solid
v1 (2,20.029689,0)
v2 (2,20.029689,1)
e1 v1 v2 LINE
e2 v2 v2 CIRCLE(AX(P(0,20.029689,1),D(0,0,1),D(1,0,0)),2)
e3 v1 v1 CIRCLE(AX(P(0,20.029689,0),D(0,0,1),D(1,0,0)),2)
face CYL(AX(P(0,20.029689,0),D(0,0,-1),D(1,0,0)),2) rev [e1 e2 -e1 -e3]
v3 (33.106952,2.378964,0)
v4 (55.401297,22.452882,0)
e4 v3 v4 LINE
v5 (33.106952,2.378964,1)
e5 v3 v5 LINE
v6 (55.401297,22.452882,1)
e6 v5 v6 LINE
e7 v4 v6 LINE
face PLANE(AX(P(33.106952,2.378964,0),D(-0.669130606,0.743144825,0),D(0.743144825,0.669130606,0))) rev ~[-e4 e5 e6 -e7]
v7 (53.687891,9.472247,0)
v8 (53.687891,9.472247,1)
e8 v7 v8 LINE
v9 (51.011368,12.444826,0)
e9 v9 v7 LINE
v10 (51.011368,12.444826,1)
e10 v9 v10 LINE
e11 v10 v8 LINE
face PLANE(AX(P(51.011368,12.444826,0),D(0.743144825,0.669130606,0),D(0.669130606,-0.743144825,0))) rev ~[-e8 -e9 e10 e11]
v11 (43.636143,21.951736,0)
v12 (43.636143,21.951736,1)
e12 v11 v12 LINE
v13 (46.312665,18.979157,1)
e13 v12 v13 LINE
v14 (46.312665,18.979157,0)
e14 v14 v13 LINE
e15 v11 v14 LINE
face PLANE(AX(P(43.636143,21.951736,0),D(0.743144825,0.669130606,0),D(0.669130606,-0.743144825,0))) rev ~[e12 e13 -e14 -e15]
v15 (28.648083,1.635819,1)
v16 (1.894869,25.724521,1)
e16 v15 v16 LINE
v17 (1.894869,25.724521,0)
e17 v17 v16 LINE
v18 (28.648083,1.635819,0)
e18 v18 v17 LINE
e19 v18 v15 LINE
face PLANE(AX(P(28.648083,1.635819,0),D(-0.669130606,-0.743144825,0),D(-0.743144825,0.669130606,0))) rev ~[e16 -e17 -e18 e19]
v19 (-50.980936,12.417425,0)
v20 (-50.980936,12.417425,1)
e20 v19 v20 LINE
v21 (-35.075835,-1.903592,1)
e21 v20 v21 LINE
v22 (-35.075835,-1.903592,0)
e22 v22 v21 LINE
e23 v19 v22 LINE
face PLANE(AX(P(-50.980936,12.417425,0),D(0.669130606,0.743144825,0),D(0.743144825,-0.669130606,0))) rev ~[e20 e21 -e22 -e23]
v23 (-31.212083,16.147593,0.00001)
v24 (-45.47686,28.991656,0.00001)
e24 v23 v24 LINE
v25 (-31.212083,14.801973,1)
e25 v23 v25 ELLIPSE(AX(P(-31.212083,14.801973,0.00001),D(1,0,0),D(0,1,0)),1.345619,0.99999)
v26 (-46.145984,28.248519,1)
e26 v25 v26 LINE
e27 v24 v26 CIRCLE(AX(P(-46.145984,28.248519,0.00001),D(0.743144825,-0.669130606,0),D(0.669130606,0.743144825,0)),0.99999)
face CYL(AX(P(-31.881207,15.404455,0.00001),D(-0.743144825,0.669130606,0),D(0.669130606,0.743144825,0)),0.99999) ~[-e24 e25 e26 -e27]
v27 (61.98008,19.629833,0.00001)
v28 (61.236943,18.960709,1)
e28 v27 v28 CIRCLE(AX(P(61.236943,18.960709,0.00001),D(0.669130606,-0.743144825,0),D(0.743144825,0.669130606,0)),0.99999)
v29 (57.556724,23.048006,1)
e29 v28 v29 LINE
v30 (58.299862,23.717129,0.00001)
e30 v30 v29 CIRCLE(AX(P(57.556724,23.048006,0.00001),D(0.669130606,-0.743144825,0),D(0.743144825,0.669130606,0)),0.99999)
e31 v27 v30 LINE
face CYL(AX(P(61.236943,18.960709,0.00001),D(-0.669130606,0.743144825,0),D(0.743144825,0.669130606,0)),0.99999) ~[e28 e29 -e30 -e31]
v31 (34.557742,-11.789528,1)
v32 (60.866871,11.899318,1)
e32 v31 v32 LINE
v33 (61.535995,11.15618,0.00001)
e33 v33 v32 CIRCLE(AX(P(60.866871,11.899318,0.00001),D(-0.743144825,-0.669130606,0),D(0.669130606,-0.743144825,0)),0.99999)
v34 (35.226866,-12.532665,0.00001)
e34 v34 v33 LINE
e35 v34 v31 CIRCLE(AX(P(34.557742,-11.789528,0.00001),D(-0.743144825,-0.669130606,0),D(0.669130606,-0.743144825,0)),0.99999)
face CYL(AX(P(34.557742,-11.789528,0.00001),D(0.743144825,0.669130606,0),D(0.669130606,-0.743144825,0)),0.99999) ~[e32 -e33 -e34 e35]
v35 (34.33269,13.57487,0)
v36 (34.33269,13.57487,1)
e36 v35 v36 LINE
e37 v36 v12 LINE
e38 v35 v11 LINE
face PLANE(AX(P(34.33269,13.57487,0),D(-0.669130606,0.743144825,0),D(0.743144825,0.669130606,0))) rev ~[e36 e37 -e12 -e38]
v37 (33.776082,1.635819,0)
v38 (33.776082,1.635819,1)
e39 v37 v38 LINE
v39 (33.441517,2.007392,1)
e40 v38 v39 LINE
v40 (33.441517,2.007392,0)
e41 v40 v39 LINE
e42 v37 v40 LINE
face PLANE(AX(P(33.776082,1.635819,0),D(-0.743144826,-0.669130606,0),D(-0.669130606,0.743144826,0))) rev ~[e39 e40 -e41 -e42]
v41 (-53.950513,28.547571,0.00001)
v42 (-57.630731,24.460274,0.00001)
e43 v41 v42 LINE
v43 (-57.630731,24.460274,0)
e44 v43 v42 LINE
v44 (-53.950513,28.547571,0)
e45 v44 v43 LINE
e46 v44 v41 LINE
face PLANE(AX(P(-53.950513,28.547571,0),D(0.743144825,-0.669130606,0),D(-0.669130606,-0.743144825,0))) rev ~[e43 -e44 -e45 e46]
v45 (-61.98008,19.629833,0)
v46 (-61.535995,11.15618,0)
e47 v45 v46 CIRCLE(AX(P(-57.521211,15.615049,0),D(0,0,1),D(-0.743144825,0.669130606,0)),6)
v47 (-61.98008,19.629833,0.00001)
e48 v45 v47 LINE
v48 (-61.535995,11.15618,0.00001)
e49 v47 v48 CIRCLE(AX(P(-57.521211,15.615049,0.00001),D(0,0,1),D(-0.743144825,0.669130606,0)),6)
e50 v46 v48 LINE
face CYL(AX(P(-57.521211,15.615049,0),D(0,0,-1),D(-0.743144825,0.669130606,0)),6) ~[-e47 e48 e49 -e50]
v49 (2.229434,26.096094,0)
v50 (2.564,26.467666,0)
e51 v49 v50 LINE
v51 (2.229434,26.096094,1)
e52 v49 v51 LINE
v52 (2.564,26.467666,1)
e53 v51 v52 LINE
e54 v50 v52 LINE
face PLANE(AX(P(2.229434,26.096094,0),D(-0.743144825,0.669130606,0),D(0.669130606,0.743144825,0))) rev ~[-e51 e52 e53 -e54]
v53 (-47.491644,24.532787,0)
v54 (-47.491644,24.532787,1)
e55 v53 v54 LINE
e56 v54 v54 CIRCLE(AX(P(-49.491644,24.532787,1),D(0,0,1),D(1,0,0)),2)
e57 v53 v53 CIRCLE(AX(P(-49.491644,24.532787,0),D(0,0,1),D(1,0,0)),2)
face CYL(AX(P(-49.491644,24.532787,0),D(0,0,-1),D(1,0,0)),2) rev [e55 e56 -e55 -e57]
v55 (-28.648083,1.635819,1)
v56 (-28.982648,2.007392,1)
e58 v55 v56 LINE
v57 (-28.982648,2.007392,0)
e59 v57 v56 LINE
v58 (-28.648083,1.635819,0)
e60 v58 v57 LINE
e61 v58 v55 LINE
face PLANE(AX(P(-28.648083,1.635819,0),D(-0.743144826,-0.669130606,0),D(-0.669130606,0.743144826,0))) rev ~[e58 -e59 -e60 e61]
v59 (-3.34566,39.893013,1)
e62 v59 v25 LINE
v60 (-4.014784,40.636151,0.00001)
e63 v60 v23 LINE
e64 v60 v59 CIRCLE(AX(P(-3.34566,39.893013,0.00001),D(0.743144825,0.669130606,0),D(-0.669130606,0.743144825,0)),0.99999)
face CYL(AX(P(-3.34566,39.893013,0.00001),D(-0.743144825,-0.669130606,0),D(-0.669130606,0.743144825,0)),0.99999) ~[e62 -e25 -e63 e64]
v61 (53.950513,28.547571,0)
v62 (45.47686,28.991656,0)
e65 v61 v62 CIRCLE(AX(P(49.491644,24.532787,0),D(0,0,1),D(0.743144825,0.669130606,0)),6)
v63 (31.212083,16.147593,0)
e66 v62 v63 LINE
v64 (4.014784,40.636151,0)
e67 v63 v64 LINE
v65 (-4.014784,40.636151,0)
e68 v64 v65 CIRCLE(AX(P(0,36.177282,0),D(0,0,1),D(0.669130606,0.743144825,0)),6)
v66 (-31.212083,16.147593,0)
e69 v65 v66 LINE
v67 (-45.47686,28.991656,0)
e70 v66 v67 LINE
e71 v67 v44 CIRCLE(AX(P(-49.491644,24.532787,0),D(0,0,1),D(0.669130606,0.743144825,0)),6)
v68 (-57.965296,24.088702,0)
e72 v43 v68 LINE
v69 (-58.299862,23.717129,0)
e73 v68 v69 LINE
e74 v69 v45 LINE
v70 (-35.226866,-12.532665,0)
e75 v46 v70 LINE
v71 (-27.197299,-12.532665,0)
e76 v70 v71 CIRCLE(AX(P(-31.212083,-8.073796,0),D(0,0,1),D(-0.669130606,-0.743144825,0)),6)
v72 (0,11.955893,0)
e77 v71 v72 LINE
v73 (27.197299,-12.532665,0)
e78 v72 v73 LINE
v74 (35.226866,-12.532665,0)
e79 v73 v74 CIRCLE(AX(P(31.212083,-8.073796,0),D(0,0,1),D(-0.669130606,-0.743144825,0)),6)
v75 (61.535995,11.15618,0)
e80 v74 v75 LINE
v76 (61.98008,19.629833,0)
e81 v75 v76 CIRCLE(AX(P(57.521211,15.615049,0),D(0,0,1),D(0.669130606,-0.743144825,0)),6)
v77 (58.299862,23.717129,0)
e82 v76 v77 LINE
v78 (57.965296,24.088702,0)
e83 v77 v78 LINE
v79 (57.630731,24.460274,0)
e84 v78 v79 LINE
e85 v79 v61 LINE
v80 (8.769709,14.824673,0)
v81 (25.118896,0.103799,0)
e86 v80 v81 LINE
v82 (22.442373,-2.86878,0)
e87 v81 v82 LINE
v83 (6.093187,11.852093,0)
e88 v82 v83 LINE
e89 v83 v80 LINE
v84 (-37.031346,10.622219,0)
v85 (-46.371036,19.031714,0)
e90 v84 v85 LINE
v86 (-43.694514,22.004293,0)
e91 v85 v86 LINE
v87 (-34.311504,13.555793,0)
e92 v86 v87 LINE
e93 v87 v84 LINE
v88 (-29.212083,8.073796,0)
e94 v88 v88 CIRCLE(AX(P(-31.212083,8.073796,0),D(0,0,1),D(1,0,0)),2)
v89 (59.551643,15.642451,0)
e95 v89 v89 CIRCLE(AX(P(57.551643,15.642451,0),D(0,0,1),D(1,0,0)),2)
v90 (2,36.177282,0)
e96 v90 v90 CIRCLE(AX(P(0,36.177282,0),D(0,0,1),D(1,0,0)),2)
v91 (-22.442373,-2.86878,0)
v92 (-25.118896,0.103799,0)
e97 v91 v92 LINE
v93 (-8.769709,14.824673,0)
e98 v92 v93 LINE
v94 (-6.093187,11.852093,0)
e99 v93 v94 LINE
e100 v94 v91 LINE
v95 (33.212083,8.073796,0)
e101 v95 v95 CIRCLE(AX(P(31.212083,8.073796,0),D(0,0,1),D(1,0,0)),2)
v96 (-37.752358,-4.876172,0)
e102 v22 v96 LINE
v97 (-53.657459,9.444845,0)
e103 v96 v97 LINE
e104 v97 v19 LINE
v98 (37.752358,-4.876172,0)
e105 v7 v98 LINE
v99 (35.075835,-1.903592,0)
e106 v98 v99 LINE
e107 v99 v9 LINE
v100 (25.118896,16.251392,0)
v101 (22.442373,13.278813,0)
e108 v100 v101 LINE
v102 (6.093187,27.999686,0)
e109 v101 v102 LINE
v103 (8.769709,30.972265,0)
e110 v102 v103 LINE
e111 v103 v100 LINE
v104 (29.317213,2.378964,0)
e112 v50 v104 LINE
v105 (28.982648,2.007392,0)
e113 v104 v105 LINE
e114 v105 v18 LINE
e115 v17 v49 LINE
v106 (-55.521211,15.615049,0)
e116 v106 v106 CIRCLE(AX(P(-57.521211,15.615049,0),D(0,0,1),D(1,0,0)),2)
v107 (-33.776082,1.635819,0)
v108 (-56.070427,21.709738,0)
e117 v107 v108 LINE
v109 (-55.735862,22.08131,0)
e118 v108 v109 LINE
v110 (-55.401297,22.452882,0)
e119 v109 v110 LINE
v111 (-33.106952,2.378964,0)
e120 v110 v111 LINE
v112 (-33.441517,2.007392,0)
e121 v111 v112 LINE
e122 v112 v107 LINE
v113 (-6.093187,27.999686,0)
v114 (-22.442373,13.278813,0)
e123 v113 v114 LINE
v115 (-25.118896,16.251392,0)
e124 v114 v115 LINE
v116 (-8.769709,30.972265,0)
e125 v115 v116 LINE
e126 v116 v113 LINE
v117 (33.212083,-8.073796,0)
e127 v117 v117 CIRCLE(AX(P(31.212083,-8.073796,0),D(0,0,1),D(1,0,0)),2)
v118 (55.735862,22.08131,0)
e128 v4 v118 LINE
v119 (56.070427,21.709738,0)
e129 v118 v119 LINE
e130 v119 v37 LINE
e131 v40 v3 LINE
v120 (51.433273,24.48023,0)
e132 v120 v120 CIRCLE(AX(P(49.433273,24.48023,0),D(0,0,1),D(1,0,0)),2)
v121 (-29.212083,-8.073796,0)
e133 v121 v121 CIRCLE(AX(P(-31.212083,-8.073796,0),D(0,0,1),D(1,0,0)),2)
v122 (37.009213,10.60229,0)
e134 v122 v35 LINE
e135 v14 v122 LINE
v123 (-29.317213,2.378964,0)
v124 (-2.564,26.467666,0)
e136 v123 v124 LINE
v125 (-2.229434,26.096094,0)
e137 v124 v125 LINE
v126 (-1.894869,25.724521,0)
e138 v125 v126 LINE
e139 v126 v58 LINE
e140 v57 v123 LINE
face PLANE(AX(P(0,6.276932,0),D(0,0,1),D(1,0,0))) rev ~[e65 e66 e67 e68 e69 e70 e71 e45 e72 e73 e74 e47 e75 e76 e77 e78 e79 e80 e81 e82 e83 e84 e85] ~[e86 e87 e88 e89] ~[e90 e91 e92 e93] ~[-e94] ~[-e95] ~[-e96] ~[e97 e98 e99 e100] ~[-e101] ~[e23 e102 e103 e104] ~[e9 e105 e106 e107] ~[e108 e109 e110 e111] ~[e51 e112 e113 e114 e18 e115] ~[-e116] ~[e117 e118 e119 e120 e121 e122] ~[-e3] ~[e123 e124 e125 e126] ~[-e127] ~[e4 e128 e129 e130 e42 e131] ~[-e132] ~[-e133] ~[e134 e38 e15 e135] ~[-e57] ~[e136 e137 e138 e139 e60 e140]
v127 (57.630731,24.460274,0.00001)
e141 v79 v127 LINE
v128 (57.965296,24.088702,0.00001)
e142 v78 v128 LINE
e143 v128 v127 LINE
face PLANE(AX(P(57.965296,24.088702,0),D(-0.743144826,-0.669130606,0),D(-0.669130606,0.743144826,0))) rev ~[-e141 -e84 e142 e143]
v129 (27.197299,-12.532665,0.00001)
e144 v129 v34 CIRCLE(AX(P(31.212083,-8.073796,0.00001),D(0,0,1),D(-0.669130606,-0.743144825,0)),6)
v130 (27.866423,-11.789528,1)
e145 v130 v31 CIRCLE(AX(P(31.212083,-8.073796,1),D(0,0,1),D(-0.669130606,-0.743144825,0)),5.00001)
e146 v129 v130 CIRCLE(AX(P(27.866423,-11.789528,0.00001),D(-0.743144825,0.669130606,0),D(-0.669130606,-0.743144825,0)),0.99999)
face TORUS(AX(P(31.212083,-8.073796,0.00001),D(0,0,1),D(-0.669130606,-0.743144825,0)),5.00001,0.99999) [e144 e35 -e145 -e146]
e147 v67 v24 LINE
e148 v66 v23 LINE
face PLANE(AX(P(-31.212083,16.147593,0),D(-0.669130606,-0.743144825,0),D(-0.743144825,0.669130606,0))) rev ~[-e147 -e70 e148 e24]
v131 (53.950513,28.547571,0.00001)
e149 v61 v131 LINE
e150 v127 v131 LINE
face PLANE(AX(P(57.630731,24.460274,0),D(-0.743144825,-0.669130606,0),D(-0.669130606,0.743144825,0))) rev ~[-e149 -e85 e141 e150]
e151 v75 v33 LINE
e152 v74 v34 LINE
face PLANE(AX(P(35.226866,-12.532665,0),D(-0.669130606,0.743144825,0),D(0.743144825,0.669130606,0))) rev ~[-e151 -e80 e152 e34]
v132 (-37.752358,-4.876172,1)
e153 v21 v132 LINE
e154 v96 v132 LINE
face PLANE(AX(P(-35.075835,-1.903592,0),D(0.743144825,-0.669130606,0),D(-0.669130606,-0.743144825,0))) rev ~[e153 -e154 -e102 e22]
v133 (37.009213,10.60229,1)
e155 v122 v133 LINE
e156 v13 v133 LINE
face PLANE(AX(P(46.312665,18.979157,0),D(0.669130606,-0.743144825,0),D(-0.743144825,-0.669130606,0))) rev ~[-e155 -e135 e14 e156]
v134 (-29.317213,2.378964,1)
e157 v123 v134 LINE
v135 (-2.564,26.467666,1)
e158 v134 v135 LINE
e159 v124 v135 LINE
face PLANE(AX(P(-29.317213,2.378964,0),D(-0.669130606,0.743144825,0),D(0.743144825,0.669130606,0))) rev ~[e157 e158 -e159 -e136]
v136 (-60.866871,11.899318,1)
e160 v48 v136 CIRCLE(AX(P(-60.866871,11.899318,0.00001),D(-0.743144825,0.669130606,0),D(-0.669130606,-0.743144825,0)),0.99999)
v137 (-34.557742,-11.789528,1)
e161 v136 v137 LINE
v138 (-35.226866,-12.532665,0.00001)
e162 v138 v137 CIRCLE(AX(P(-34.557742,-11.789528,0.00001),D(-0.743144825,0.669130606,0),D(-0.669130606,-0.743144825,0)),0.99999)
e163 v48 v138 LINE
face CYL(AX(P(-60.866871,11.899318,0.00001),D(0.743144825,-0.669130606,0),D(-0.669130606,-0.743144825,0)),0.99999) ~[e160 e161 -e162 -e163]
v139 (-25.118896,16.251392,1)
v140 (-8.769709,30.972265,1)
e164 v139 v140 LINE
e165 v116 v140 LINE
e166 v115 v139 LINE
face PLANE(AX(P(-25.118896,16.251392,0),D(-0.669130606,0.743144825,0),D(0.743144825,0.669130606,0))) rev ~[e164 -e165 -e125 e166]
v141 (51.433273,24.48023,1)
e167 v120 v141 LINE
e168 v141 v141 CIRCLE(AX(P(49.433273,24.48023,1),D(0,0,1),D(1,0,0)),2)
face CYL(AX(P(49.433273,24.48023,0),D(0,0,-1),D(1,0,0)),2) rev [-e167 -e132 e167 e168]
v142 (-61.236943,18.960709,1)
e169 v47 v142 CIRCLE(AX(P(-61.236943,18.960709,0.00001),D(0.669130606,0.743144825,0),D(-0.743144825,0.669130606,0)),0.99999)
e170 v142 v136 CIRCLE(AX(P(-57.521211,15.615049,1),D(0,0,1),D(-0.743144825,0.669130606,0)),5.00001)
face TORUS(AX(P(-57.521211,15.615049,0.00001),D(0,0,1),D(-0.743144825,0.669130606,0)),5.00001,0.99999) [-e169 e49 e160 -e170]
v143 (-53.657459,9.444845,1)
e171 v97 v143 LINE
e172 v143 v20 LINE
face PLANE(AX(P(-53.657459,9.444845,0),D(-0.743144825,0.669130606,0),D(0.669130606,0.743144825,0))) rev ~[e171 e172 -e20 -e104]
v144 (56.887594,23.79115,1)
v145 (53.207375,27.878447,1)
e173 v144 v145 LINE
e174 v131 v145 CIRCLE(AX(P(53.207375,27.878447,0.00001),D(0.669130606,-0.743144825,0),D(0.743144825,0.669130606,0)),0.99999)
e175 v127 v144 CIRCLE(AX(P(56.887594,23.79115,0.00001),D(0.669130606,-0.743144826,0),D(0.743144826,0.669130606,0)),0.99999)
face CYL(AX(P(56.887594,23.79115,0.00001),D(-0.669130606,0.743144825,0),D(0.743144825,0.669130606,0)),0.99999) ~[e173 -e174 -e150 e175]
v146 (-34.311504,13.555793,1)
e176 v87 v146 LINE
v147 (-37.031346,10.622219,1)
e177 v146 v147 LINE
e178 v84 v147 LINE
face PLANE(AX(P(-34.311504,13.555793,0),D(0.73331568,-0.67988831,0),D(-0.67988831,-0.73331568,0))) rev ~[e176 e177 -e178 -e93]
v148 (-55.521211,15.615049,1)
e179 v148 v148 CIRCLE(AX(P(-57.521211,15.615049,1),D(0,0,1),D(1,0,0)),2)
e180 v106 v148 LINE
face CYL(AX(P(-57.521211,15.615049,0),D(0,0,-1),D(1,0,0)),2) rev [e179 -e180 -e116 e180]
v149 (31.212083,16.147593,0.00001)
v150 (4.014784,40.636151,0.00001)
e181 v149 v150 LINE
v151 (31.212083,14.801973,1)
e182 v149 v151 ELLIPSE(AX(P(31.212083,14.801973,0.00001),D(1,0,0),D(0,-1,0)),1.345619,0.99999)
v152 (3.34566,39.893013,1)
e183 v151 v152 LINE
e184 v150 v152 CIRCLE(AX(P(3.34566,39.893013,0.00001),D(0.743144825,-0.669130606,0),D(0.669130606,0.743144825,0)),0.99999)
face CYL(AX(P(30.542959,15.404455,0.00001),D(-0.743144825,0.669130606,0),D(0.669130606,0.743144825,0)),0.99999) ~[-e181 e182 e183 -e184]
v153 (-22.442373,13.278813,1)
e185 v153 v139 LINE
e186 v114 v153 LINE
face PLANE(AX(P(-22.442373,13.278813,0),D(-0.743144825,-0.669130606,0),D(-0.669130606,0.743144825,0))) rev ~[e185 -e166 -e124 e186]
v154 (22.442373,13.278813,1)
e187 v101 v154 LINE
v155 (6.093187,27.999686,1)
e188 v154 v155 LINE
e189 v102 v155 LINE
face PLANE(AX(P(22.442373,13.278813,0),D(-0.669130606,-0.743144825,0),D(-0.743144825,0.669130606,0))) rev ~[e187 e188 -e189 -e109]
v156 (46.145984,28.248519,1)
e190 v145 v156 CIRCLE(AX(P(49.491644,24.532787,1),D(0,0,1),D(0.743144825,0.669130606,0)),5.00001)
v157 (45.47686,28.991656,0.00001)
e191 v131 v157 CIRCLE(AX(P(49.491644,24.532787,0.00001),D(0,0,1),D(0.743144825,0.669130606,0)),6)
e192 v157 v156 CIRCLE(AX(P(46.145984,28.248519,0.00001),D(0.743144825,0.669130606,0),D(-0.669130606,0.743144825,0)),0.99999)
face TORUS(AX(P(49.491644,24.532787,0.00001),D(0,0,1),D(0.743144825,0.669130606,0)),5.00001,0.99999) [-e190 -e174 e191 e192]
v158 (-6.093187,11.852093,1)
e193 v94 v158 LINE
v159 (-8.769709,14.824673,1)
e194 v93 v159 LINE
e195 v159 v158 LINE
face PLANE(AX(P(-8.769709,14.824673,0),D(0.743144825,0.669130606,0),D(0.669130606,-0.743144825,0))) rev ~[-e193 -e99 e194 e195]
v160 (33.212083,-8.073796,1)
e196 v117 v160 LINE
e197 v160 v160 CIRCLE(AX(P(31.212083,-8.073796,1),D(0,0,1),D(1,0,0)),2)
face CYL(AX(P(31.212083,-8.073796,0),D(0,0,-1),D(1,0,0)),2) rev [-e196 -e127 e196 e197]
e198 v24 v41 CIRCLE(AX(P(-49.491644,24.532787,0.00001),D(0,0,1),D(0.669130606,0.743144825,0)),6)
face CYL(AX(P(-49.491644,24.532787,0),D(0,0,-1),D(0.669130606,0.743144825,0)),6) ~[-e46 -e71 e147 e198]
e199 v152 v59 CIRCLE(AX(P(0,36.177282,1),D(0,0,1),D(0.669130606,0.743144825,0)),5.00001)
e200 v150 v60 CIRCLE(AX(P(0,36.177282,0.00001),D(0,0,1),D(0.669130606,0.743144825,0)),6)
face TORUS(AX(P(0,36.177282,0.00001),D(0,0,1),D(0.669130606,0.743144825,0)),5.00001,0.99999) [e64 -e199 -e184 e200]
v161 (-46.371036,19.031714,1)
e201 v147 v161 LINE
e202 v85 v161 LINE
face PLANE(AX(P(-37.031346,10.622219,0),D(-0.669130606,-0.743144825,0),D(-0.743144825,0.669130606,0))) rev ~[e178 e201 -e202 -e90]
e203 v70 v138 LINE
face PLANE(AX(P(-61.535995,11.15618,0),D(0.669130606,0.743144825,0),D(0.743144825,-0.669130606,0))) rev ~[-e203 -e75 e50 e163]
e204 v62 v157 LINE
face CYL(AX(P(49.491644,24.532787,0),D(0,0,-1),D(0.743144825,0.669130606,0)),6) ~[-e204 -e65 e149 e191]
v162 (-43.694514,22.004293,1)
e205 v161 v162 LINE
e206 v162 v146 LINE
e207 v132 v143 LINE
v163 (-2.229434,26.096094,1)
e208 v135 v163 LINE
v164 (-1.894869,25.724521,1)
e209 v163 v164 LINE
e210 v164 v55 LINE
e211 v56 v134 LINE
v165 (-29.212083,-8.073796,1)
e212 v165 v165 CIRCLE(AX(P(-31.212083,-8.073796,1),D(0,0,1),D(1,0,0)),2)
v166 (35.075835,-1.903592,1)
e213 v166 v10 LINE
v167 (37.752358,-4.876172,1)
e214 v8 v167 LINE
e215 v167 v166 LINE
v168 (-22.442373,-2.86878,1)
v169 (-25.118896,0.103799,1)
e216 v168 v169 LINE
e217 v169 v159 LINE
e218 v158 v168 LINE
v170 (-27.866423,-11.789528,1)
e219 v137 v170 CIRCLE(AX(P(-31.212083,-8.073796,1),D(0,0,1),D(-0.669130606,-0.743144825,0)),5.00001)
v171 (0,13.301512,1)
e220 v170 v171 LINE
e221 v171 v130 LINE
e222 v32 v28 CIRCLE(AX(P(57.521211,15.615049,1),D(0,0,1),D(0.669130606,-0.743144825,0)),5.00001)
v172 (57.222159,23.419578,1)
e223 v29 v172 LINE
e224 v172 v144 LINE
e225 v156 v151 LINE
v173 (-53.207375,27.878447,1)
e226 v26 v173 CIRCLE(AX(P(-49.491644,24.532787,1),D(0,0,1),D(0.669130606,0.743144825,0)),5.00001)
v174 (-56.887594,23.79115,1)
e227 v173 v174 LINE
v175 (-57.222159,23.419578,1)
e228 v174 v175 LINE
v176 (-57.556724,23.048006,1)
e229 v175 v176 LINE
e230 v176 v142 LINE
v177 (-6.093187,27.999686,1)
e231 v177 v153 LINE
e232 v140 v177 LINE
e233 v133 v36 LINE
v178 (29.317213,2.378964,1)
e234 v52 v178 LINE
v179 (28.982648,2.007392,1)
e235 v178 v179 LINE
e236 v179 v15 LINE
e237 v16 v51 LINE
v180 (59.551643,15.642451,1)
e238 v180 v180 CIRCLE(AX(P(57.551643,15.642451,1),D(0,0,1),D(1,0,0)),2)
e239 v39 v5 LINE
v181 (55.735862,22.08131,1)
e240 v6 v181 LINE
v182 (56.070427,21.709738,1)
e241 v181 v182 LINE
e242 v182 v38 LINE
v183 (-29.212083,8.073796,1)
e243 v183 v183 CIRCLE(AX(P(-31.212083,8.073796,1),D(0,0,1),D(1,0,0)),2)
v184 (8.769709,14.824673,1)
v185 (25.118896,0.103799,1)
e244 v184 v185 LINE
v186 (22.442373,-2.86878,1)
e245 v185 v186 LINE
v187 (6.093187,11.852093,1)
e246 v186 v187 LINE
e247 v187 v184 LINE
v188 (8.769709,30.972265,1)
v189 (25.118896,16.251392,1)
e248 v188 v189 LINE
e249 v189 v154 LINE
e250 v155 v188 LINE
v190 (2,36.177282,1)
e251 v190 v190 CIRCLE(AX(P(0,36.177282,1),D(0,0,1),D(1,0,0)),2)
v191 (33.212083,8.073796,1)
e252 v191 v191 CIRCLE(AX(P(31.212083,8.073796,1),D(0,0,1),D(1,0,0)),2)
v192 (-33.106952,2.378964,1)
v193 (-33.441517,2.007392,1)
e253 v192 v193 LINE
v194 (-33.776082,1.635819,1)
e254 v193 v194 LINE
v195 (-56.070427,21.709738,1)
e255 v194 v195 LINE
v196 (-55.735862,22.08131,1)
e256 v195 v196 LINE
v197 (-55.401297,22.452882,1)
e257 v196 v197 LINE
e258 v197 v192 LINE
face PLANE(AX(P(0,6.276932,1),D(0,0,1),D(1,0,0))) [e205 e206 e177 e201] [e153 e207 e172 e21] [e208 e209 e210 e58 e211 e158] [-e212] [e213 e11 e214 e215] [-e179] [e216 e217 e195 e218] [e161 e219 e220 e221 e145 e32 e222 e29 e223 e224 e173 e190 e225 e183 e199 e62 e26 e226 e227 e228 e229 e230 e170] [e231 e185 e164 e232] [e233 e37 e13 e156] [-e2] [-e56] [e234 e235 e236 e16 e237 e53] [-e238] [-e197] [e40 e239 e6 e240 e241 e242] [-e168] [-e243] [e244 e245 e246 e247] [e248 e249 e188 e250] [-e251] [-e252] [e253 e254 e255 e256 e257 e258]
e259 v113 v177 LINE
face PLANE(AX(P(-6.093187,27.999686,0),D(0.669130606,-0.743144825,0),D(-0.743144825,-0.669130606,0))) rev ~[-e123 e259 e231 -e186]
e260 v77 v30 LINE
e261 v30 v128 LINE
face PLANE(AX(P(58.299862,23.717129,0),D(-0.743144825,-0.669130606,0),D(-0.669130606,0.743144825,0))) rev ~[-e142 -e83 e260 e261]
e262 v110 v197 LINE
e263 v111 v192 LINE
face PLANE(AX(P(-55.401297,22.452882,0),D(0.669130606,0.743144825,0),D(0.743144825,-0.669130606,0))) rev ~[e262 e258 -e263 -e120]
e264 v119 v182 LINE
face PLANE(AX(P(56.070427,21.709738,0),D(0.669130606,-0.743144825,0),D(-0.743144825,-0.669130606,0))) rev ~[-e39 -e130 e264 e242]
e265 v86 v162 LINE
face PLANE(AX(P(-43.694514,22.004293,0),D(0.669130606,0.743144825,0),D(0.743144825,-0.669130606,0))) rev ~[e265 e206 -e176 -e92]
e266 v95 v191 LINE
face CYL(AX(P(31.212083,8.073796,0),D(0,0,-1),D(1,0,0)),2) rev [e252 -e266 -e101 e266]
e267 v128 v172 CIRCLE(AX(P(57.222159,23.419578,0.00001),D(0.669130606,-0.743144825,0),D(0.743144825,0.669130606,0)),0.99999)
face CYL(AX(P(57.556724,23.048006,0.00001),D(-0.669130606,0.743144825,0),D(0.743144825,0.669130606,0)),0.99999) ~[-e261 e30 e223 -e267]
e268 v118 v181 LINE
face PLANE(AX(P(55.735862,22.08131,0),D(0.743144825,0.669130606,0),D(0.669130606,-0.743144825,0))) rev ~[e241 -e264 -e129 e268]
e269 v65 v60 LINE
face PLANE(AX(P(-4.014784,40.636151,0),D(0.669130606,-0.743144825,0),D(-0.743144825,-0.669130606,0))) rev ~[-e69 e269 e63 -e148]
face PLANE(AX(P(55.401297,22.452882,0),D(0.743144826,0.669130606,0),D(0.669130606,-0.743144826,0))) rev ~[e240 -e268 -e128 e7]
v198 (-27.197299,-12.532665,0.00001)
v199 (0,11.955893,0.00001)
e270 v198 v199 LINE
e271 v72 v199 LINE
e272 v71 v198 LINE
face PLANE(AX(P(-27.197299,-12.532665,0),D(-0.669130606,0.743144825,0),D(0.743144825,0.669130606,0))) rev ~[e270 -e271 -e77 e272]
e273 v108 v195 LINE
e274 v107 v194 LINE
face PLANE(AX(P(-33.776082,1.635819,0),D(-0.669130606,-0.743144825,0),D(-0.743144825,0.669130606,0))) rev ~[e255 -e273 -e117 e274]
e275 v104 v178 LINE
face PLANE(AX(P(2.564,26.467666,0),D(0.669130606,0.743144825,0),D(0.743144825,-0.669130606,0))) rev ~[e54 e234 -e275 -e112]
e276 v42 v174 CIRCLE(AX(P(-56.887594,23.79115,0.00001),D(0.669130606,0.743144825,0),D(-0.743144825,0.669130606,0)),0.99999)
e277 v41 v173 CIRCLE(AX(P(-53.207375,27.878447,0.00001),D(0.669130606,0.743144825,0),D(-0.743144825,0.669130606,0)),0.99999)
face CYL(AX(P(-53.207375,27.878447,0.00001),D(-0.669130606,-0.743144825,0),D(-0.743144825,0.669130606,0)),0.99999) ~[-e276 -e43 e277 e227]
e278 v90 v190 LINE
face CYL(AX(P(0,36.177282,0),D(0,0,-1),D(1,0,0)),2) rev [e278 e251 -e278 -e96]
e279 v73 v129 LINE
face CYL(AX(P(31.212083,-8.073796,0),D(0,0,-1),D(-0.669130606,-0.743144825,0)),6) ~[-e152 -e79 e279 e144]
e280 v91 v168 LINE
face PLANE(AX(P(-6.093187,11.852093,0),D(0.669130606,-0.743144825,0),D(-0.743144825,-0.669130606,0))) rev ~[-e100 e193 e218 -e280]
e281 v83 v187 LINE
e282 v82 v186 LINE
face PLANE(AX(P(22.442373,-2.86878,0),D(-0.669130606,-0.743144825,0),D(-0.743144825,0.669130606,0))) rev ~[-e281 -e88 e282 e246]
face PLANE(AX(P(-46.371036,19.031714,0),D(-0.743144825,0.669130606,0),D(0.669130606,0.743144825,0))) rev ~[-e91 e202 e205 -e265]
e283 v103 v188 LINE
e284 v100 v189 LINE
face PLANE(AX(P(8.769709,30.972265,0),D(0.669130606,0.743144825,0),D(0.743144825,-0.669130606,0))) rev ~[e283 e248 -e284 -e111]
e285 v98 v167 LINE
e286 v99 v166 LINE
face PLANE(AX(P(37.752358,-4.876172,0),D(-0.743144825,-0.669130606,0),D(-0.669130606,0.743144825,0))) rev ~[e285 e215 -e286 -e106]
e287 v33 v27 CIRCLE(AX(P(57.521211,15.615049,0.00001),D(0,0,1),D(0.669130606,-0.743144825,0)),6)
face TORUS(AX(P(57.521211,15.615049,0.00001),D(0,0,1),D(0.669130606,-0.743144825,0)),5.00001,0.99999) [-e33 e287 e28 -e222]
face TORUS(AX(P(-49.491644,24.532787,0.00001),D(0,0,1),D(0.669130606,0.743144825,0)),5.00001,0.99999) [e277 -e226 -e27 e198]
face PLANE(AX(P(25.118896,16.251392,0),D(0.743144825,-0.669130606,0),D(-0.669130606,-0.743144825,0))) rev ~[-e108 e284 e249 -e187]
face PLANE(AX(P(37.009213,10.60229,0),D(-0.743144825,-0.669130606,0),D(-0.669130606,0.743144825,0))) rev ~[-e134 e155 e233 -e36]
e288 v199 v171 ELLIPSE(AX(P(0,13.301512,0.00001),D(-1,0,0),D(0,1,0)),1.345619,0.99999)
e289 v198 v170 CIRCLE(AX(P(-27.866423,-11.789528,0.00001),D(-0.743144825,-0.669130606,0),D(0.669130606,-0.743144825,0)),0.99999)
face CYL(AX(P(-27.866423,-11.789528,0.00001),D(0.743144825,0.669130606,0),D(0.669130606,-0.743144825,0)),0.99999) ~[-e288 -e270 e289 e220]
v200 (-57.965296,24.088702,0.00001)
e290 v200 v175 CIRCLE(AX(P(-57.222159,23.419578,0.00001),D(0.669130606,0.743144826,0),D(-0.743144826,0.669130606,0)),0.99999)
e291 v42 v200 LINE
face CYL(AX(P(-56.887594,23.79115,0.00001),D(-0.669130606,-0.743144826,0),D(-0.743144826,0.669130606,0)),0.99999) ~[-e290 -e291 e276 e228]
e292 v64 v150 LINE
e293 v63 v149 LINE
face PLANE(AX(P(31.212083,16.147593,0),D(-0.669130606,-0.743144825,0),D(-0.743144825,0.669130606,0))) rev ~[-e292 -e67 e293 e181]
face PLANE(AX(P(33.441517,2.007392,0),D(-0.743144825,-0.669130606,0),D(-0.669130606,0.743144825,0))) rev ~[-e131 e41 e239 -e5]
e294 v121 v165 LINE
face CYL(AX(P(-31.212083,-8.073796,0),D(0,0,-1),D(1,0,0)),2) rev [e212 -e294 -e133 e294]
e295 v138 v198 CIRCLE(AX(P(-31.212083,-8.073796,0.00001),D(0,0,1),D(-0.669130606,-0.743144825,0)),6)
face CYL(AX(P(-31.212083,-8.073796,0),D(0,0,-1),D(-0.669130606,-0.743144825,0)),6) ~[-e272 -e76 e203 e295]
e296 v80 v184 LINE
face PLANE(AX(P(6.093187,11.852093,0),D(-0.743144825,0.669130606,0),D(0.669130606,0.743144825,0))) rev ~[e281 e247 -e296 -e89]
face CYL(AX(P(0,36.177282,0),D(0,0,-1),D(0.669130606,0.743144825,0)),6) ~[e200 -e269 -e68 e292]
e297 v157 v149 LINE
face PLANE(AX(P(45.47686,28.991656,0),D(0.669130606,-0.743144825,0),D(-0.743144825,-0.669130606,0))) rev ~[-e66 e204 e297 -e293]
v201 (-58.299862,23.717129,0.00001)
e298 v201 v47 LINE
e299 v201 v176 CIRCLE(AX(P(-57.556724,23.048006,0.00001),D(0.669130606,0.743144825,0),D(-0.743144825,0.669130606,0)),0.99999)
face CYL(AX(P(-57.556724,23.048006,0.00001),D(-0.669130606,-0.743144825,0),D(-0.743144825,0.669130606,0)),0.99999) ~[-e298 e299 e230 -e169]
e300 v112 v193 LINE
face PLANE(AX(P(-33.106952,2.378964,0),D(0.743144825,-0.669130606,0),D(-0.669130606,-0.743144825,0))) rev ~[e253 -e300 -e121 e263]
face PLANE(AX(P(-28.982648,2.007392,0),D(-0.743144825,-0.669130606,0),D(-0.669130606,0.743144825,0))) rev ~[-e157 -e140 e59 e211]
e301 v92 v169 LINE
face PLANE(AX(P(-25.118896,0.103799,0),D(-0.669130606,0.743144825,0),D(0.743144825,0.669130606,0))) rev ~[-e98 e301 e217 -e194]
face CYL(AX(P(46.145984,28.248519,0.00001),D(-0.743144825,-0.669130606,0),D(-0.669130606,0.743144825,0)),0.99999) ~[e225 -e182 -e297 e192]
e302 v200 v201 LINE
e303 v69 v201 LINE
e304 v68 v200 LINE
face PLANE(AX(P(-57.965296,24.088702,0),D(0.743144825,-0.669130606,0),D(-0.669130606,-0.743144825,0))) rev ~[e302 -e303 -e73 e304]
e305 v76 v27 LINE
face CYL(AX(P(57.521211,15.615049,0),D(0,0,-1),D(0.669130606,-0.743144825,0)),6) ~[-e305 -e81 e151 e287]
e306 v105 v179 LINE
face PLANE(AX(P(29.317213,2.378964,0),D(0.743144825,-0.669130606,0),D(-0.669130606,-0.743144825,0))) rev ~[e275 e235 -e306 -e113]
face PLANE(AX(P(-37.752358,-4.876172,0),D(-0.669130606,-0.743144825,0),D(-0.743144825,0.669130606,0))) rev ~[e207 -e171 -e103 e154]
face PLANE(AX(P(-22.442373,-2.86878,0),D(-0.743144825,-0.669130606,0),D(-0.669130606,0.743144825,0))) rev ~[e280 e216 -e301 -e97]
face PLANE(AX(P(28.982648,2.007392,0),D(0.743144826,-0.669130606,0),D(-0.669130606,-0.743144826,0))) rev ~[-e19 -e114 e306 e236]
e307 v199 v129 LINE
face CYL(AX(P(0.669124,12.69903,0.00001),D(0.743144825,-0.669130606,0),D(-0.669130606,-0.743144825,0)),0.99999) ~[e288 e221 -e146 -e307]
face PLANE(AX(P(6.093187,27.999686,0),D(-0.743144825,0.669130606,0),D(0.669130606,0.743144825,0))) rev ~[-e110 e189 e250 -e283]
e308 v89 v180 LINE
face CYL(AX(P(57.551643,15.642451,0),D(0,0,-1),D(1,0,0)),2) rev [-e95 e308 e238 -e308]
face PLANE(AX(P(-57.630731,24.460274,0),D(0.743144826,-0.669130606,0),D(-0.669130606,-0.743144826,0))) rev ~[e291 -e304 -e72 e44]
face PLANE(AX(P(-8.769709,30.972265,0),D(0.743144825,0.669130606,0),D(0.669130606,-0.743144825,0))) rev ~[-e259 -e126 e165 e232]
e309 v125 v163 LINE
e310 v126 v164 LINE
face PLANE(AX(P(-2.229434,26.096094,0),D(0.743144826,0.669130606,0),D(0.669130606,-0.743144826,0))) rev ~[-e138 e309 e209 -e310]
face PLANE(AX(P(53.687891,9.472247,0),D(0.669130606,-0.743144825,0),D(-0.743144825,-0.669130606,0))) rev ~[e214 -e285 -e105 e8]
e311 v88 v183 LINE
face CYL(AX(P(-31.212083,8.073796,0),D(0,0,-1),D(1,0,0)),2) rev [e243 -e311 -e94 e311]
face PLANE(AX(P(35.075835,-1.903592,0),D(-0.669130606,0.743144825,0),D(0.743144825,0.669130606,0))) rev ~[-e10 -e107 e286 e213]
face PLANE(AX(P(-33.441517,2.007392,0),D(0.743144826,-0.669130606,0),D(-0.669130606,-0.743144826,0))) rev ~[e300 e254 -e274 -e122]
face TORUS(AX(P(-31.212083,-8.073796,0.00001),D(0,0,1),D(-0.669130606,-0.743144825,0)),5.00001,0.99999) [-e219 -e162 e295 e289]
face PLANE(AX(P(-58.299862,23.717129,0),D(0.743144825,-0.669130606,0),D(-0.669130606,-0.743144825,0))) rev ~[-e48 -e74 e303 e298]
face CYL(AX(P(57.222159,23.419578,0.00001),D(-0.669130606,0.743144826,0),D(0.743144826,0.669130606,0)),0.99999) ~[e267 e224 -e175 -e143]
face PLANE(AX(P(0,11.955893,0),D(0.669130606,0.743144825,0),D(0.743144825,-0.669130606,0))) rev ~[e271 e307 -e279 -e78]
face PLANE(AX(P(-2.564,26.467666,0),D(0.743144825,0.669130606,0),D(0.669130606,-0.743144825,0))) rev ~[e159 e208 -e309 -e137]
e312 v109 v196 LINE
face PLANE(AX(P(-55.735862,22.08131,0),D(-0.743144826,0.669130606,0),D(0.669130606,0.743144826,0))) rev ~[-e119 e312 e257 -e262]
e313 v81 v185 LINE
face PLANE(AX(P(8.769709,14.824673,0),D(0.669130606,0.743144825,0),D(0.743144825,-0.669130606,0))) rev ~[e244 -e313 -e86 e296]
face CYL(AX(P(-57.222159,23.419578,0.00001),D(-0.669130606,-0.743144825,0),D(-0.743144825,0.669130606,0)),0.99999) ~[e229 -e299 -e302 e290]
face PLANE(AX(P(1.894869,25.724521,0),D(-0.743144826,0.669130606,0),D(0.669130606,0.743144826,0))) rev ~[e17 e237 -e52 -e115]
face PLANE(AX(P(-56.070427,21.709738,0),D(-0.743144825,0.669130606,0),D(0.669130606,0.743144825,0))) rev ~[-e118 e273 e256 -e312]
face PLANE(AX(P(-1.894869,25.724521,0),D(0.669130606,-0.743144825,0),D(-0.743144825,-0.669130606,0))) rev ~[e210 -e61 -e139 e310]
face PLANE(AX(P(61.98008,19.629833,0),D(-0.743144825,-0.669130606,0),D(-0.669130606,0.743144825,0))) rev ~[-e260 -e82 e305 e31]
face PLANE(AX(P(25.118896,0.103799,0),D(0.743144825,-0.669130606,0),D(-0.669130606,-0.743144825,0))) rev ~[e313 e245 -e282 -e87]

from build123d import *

# Parameters (mm, degrees)
F0_R     = 2
F1_DEPTH = 1
F2_R     = 0.99999


# Not quite as in the source:
# - a fillet or chamfer is up to 0.001 mm smaller than in the source, because OpenCascade refuses the exact size


with BuildPart() as f1:
    # F0 (on Top) → F1 (new body)
    with BuildSketch(Plane.XY):
        with BuildLine():
            Line((-56.070427214, 21.7097375971), (-58.2998616904, 23.7171294162))
            Line((-58.2998616904, 23.7171294162), (-61.9800800254, 19.6298328761))
            ThreePointArc((-61.9800800254, 19.6298328761), (-63.5129882811, 15.3010335004), (-61.5359947107, 11.156180285))
            Line((-61.5359947107, 11.156180285), (-35.2268663082, -12.5326653305))
            ThreePointArc((-35.2268663082, -12.5326653305), (-31.2120826701, -14.0737963776), (-27.1972990319, -12.5326653305))
            Line((-27.1972990319, -12.5326653305), (0, 11.9558927118))
            Line((0, 11.9558927118), (27.1972990319, -12.5326653305))
            ThreePointArc((27.1972990319, -12.5326653305), (31.2120826701, -14.0737963776), (35.2268663082, -12.5326653305))
            Line((35.2268663082, -12.5326653305), (61.5359947107, 11.156180285))
            ThreePointArc((61.5359947107, 11.156180285), (63.5129882811, 15.3010335004), (61.9800800254, 19.6298328761))
            Line((61.9800800254, 19.6298328761), (58.2998616904, 23.7171294162))
            Line((58.2998616904, 23.7171294162), (56.070427214, 21.7097375971))
            Line((56.070427214, 21.7097375971), (33.7760824497, 1.6358194063))
            Line((33.7760824497, 1.6358194063), (31.2120826701, -0.6728163648))
            Line((31.2120826701, -0.6728163648), (28.6480828904, 1.6358194063))
            Line((28.6480828904, 1.6358194063), (1.8948691733, 25.7245212353))
            Line((1.8948691733, 25.7245212353), (0, 27.4306691023))
            Line((0, 27.4306691023), (-1.8948691733, 25.7245212353))
            Line((-1.8948691733, 25.7245212353), (-28.6480828904, 1.6358194063))
            Line((-28.6480828904, 1.6358194063), (-31.2120826701, -0.6728163648))
            Line((-31.2120826701, -0.6728163648), (-33.7760824497, 1.6358194063))
            Line((-33.7760824497, 1.6358194063), (-56.070427214, 21.7097375971))
        make_face()
        with Locations((-31.2120826701, -8.0737963776)):
            Circle(F0_R, mode=Mode.SUBTRACT)
        Polygon((-53.6574585069, 9.4448453424), (-50.9809360815, 12.4174246443), (-35.0758352357, -1.9035924822), (-37.7523576611, -4.8761717841), align=None, mode=Mode.SUBTRACT)
        Polygon((-6.0931870421, 11.8520933749), (-22.4423732026, -2.868779965), (-25.118895628, 0.1037993369), (-8.7697094675, 14.8246726768), align=None, mode=Mode.SUBTRACT)
        with Locations((31.2120826701, -8.0737963776)):
            Circle(F0_R, mode=Mode.SUBTRACT)
        Polygon((22.4423732026, -2.868779965), (6.0931870421, 11.8520933749), (8.7697094675, 14.8246726768), (25.118895628, 0.1037993369), align=None, mode=Mode.SUBTRACT)
        Polygon((37.7523576611, -4.8761717841), (35.0758352357, -1.9035924822), (51.0113683193, 12.4448259544), (53.6878907447, 9.4722466525), align=None, mode=Mode.SUBTRACT)
        with Locations((-57.5212110725, 15.6150492379)):
            Circle(F0_R, mode=Mode.SUBTRACT)
        with Locations((0, 20.0296890894)):
            Circle(F0_R, mode=Mode.SUBTRACT)
        with Locations((57.5516433104, 15.6424505479)):
            Circle(F0_R, mode=Mode.SUBTRACT)
        Polygon((-55.7358619108, 22.0813100098), (-57.9652963872, 24.0887018289), (-58.2998616904, 23.7171294162), (-56.070427214, 21.7097375971), align=None)
        Polygon((-57.6307310841, 24.4602742417), (-57.9652963872, 24.0887018289), (-55.7358619108, 22.0813100098), (-55.4012966076, 22.4528824226), align=None)
        with BuildLine():
            Line((-53.9505127491, 28.5475707818), (-57.6307310841, 24.4602742417))
            Line((-57.6307310841, 24.4602742417), (-55.4012966076, 22.4528824226))
            Line((-55.4012966076, 22.4528824226), (-33.1069518433, 2.3789642318))
            Line((-33.1069518433, 2.3789642318), (-31.2120826701, 0.6728163648))
            Line((-31.2120826701, 0.6728163648), (-29.3172134968, 2.3789642318))
            Line((-29.3172134968, 2.3789642318), (-2.5639997796, 26.4676660607))
            Line((-2.5639997796, 26.4676660607), (0, 28.7763018319))
            Line((0, 28.7763018319), (2.5639997796, 26.4676660607))
            Line((2.5639997796, 26.4676660607), (29.3172134968, 2.3789642318))
            Line((29.3172134968, 2.3789642318), (31.2120826701, 0.6728163648))
            Line((31.2120826701, 0.6728163648), (33.1069518433, 2.3789642318))
            Line((33.1069518433, 2.3789642318), (55.4012966076, 22.4528824226))
            Line((55.4012966076, 22.4528824226), (57.6307310841, 24.4602742417))
            Line((57.6307310841, 24.4602742417), (53.9505127491, 28.5475707818))
            ThreePointArc((53.9505127491, 28.5475707818), (49.8056595337, 30.5245643522), (45.4768601581, 28.9916560965))
            Line((45.4768601581, 28.9916560965), (31.2120826701, 16.1475927553))
            Line((31.2120826701, 16.1475927553), (4.0147836382, 40.6361507976))
            ThreePointArc((4.0147836382, 40.6361507976), (0, 42.1772818447), (-4.0147836382, 40.6361507976))
            Line((-4.0147836382, 40.6361507976), (-31.2120826701, 16.1475927553))
            Line((-31.2120826701, 16.1475927553), (-45.4768601581, 28.9916560965))
            ThreePointArc((-45.4768601581, 28.9916560965), (-49.8056595337, 30.5245643522), (-53.9505127491, 28.5475707818))
        make_face()
        with Locations((-31.2120826701, 8.0737963776)):
            Circle(F0_R, mode=Mode.SUBTRACT)
        with Locations((31.2120826701, 8.0737963776)):
            Circle(F0_R, mode=Mode.SUBTRACT)
        Polygon((-46.3710360561, 19.0317138545), (-43.6945136306, 22.0042931564), (-34.3115040691, 13.5557933995), (-37.0313460748, 10.6222192229), align=None, mode=Mode.SUBTRACT)
        with Locations((-49.4916437962, 24.5327871436)):
            Circle(F0_R, mode=Mode.SUBTRACT)
        Polygon((-22.4423732026, 13.2788127903), (-25.118895628, 16.2513920922), (-8.7697094675, 30.9722654321), (-6.0931870421, 27.9996861302), align=None, mode=Mode.SUBTRACT)
        Polygon((6.0931870421, 27.9996861302), (8.7697094675, 30.9722654321), (25.118895628, 16.2513920922), (22.4423732026, 13.2788127903), align=None, mode=Mode.SUBTRACT)
        Polygon((37.0092128356, 10.6022903648), (34.3326904102, 13.5748696667), (43.6361429708, 21.9517359782), (46.3126653962, 18.9791566763), align=None, mode=Mode.SUBTRACT)
        with Locations((49.4332731364, 24.4802299654)):
            Circle(F0_R, mode=Mode.SUBTRACT)
        with Locations((0, 36.1772818447)):
            Circle(F0_R, mode=Mode.SUBTRACT)
        Polygon((-31.2120826701, 0), (-33.4415171465, 2.0073918191), (-33.7760824497, 1.6358194063), (-31.2120826701, -0.6728163648), (-28.6480828904, 1.6358194063), (-28.9826481936, 2.0073918191), align=None)
        Polygon((-33.1069518433, 2.3789642318), (-33.4415171465, 2.0073918191), (-31.2120826701, 0), (-28.9826481936, 2.0073918191), (-29.3172134968, 2.3789642318), (-31.2120826701, 0.6728163648), align=None)
        Polygon((0, 28.1034854671), (-2.2294344764, 26.096093648), (-1.8948691733, 25.7245212353), (0, 27.4306691023), (1.8948691733, 25.7245212353), (2.2294344764, 26.096093648), align=None)
        Polygon((-2.5639997796, 26.4676660607), (-2.2294344764, 26.096093648), (0, 28.1034854671), (2.2294344764, 26.096093648), (2.5639997796, 26.4676660607), (0, 28.7763018319), align=None)
        Polygon((31.2120826701, 0), (28.9826481936, 2.0073918191), (28.6480828904, 1.6358194063), (31.2120826701, -0.6728163648), (33.7760824497, 1.6358194063), (33.4415171465, 2.0073918191), align=None)
        Polygon((29.3172134968, 2.3789642318), (28.9826481936, 2.0073918191), (31.2120826701, 0), (33.4415171465, 2.0073918191), (33.1069518433, 2.3789642318), (31.2120826701, 0.6728163648), align=None)
        Polygon((57.9652963872, 24.0887018289), (55.7358619108, 22.0813100098), (56.070427214, 21.7097375971), (58.2998616904, 23.7171294162), align=None)
        Polygon((57.9652963872, 24.0887018289), (57.6307310841, 24.4602742417), (55.4012966076, 22.4528824226), (55.7358619108, 22.0813100098), align=None)
    extrude(amount=F1_DEPTH)

    # F2 (radius 1 in the source; OpenCascade refuses exactly that, so slightly less here)
    f2_edges = [f1.edges().sort_by_distance(p)[0] for p in [
        (-63.512988, 15.301034, 1),
        (-48.381431, -0.688243, 1),
        (-31.212083, -14.073796, 1),
        (-13.59865, -0.288386, 1),
        (13.59865, -0.288386, 1),
        (31.212083, -14.073796, 1),
        (48.381431, -0.688243, 1),
        (63.512988, 15.301034, 1),
        (57.965296, 24.088702, 1),
        (49.80566, 30.524564, 1),
        (38.344471, 22.569624, 1),
        (17.613433, 28.391872, 1),
        (0, 42.177282, 1),
        (-17.613433, 28.391872, 1),
        (-38.344471, 22.569624, 1),
        (-49.80566, 30.524564, 1),
        (-57.965296, 24.088702, 1),
    ]]
    fillet(f2_edges, radius=F2_R)


solid = f1.part
